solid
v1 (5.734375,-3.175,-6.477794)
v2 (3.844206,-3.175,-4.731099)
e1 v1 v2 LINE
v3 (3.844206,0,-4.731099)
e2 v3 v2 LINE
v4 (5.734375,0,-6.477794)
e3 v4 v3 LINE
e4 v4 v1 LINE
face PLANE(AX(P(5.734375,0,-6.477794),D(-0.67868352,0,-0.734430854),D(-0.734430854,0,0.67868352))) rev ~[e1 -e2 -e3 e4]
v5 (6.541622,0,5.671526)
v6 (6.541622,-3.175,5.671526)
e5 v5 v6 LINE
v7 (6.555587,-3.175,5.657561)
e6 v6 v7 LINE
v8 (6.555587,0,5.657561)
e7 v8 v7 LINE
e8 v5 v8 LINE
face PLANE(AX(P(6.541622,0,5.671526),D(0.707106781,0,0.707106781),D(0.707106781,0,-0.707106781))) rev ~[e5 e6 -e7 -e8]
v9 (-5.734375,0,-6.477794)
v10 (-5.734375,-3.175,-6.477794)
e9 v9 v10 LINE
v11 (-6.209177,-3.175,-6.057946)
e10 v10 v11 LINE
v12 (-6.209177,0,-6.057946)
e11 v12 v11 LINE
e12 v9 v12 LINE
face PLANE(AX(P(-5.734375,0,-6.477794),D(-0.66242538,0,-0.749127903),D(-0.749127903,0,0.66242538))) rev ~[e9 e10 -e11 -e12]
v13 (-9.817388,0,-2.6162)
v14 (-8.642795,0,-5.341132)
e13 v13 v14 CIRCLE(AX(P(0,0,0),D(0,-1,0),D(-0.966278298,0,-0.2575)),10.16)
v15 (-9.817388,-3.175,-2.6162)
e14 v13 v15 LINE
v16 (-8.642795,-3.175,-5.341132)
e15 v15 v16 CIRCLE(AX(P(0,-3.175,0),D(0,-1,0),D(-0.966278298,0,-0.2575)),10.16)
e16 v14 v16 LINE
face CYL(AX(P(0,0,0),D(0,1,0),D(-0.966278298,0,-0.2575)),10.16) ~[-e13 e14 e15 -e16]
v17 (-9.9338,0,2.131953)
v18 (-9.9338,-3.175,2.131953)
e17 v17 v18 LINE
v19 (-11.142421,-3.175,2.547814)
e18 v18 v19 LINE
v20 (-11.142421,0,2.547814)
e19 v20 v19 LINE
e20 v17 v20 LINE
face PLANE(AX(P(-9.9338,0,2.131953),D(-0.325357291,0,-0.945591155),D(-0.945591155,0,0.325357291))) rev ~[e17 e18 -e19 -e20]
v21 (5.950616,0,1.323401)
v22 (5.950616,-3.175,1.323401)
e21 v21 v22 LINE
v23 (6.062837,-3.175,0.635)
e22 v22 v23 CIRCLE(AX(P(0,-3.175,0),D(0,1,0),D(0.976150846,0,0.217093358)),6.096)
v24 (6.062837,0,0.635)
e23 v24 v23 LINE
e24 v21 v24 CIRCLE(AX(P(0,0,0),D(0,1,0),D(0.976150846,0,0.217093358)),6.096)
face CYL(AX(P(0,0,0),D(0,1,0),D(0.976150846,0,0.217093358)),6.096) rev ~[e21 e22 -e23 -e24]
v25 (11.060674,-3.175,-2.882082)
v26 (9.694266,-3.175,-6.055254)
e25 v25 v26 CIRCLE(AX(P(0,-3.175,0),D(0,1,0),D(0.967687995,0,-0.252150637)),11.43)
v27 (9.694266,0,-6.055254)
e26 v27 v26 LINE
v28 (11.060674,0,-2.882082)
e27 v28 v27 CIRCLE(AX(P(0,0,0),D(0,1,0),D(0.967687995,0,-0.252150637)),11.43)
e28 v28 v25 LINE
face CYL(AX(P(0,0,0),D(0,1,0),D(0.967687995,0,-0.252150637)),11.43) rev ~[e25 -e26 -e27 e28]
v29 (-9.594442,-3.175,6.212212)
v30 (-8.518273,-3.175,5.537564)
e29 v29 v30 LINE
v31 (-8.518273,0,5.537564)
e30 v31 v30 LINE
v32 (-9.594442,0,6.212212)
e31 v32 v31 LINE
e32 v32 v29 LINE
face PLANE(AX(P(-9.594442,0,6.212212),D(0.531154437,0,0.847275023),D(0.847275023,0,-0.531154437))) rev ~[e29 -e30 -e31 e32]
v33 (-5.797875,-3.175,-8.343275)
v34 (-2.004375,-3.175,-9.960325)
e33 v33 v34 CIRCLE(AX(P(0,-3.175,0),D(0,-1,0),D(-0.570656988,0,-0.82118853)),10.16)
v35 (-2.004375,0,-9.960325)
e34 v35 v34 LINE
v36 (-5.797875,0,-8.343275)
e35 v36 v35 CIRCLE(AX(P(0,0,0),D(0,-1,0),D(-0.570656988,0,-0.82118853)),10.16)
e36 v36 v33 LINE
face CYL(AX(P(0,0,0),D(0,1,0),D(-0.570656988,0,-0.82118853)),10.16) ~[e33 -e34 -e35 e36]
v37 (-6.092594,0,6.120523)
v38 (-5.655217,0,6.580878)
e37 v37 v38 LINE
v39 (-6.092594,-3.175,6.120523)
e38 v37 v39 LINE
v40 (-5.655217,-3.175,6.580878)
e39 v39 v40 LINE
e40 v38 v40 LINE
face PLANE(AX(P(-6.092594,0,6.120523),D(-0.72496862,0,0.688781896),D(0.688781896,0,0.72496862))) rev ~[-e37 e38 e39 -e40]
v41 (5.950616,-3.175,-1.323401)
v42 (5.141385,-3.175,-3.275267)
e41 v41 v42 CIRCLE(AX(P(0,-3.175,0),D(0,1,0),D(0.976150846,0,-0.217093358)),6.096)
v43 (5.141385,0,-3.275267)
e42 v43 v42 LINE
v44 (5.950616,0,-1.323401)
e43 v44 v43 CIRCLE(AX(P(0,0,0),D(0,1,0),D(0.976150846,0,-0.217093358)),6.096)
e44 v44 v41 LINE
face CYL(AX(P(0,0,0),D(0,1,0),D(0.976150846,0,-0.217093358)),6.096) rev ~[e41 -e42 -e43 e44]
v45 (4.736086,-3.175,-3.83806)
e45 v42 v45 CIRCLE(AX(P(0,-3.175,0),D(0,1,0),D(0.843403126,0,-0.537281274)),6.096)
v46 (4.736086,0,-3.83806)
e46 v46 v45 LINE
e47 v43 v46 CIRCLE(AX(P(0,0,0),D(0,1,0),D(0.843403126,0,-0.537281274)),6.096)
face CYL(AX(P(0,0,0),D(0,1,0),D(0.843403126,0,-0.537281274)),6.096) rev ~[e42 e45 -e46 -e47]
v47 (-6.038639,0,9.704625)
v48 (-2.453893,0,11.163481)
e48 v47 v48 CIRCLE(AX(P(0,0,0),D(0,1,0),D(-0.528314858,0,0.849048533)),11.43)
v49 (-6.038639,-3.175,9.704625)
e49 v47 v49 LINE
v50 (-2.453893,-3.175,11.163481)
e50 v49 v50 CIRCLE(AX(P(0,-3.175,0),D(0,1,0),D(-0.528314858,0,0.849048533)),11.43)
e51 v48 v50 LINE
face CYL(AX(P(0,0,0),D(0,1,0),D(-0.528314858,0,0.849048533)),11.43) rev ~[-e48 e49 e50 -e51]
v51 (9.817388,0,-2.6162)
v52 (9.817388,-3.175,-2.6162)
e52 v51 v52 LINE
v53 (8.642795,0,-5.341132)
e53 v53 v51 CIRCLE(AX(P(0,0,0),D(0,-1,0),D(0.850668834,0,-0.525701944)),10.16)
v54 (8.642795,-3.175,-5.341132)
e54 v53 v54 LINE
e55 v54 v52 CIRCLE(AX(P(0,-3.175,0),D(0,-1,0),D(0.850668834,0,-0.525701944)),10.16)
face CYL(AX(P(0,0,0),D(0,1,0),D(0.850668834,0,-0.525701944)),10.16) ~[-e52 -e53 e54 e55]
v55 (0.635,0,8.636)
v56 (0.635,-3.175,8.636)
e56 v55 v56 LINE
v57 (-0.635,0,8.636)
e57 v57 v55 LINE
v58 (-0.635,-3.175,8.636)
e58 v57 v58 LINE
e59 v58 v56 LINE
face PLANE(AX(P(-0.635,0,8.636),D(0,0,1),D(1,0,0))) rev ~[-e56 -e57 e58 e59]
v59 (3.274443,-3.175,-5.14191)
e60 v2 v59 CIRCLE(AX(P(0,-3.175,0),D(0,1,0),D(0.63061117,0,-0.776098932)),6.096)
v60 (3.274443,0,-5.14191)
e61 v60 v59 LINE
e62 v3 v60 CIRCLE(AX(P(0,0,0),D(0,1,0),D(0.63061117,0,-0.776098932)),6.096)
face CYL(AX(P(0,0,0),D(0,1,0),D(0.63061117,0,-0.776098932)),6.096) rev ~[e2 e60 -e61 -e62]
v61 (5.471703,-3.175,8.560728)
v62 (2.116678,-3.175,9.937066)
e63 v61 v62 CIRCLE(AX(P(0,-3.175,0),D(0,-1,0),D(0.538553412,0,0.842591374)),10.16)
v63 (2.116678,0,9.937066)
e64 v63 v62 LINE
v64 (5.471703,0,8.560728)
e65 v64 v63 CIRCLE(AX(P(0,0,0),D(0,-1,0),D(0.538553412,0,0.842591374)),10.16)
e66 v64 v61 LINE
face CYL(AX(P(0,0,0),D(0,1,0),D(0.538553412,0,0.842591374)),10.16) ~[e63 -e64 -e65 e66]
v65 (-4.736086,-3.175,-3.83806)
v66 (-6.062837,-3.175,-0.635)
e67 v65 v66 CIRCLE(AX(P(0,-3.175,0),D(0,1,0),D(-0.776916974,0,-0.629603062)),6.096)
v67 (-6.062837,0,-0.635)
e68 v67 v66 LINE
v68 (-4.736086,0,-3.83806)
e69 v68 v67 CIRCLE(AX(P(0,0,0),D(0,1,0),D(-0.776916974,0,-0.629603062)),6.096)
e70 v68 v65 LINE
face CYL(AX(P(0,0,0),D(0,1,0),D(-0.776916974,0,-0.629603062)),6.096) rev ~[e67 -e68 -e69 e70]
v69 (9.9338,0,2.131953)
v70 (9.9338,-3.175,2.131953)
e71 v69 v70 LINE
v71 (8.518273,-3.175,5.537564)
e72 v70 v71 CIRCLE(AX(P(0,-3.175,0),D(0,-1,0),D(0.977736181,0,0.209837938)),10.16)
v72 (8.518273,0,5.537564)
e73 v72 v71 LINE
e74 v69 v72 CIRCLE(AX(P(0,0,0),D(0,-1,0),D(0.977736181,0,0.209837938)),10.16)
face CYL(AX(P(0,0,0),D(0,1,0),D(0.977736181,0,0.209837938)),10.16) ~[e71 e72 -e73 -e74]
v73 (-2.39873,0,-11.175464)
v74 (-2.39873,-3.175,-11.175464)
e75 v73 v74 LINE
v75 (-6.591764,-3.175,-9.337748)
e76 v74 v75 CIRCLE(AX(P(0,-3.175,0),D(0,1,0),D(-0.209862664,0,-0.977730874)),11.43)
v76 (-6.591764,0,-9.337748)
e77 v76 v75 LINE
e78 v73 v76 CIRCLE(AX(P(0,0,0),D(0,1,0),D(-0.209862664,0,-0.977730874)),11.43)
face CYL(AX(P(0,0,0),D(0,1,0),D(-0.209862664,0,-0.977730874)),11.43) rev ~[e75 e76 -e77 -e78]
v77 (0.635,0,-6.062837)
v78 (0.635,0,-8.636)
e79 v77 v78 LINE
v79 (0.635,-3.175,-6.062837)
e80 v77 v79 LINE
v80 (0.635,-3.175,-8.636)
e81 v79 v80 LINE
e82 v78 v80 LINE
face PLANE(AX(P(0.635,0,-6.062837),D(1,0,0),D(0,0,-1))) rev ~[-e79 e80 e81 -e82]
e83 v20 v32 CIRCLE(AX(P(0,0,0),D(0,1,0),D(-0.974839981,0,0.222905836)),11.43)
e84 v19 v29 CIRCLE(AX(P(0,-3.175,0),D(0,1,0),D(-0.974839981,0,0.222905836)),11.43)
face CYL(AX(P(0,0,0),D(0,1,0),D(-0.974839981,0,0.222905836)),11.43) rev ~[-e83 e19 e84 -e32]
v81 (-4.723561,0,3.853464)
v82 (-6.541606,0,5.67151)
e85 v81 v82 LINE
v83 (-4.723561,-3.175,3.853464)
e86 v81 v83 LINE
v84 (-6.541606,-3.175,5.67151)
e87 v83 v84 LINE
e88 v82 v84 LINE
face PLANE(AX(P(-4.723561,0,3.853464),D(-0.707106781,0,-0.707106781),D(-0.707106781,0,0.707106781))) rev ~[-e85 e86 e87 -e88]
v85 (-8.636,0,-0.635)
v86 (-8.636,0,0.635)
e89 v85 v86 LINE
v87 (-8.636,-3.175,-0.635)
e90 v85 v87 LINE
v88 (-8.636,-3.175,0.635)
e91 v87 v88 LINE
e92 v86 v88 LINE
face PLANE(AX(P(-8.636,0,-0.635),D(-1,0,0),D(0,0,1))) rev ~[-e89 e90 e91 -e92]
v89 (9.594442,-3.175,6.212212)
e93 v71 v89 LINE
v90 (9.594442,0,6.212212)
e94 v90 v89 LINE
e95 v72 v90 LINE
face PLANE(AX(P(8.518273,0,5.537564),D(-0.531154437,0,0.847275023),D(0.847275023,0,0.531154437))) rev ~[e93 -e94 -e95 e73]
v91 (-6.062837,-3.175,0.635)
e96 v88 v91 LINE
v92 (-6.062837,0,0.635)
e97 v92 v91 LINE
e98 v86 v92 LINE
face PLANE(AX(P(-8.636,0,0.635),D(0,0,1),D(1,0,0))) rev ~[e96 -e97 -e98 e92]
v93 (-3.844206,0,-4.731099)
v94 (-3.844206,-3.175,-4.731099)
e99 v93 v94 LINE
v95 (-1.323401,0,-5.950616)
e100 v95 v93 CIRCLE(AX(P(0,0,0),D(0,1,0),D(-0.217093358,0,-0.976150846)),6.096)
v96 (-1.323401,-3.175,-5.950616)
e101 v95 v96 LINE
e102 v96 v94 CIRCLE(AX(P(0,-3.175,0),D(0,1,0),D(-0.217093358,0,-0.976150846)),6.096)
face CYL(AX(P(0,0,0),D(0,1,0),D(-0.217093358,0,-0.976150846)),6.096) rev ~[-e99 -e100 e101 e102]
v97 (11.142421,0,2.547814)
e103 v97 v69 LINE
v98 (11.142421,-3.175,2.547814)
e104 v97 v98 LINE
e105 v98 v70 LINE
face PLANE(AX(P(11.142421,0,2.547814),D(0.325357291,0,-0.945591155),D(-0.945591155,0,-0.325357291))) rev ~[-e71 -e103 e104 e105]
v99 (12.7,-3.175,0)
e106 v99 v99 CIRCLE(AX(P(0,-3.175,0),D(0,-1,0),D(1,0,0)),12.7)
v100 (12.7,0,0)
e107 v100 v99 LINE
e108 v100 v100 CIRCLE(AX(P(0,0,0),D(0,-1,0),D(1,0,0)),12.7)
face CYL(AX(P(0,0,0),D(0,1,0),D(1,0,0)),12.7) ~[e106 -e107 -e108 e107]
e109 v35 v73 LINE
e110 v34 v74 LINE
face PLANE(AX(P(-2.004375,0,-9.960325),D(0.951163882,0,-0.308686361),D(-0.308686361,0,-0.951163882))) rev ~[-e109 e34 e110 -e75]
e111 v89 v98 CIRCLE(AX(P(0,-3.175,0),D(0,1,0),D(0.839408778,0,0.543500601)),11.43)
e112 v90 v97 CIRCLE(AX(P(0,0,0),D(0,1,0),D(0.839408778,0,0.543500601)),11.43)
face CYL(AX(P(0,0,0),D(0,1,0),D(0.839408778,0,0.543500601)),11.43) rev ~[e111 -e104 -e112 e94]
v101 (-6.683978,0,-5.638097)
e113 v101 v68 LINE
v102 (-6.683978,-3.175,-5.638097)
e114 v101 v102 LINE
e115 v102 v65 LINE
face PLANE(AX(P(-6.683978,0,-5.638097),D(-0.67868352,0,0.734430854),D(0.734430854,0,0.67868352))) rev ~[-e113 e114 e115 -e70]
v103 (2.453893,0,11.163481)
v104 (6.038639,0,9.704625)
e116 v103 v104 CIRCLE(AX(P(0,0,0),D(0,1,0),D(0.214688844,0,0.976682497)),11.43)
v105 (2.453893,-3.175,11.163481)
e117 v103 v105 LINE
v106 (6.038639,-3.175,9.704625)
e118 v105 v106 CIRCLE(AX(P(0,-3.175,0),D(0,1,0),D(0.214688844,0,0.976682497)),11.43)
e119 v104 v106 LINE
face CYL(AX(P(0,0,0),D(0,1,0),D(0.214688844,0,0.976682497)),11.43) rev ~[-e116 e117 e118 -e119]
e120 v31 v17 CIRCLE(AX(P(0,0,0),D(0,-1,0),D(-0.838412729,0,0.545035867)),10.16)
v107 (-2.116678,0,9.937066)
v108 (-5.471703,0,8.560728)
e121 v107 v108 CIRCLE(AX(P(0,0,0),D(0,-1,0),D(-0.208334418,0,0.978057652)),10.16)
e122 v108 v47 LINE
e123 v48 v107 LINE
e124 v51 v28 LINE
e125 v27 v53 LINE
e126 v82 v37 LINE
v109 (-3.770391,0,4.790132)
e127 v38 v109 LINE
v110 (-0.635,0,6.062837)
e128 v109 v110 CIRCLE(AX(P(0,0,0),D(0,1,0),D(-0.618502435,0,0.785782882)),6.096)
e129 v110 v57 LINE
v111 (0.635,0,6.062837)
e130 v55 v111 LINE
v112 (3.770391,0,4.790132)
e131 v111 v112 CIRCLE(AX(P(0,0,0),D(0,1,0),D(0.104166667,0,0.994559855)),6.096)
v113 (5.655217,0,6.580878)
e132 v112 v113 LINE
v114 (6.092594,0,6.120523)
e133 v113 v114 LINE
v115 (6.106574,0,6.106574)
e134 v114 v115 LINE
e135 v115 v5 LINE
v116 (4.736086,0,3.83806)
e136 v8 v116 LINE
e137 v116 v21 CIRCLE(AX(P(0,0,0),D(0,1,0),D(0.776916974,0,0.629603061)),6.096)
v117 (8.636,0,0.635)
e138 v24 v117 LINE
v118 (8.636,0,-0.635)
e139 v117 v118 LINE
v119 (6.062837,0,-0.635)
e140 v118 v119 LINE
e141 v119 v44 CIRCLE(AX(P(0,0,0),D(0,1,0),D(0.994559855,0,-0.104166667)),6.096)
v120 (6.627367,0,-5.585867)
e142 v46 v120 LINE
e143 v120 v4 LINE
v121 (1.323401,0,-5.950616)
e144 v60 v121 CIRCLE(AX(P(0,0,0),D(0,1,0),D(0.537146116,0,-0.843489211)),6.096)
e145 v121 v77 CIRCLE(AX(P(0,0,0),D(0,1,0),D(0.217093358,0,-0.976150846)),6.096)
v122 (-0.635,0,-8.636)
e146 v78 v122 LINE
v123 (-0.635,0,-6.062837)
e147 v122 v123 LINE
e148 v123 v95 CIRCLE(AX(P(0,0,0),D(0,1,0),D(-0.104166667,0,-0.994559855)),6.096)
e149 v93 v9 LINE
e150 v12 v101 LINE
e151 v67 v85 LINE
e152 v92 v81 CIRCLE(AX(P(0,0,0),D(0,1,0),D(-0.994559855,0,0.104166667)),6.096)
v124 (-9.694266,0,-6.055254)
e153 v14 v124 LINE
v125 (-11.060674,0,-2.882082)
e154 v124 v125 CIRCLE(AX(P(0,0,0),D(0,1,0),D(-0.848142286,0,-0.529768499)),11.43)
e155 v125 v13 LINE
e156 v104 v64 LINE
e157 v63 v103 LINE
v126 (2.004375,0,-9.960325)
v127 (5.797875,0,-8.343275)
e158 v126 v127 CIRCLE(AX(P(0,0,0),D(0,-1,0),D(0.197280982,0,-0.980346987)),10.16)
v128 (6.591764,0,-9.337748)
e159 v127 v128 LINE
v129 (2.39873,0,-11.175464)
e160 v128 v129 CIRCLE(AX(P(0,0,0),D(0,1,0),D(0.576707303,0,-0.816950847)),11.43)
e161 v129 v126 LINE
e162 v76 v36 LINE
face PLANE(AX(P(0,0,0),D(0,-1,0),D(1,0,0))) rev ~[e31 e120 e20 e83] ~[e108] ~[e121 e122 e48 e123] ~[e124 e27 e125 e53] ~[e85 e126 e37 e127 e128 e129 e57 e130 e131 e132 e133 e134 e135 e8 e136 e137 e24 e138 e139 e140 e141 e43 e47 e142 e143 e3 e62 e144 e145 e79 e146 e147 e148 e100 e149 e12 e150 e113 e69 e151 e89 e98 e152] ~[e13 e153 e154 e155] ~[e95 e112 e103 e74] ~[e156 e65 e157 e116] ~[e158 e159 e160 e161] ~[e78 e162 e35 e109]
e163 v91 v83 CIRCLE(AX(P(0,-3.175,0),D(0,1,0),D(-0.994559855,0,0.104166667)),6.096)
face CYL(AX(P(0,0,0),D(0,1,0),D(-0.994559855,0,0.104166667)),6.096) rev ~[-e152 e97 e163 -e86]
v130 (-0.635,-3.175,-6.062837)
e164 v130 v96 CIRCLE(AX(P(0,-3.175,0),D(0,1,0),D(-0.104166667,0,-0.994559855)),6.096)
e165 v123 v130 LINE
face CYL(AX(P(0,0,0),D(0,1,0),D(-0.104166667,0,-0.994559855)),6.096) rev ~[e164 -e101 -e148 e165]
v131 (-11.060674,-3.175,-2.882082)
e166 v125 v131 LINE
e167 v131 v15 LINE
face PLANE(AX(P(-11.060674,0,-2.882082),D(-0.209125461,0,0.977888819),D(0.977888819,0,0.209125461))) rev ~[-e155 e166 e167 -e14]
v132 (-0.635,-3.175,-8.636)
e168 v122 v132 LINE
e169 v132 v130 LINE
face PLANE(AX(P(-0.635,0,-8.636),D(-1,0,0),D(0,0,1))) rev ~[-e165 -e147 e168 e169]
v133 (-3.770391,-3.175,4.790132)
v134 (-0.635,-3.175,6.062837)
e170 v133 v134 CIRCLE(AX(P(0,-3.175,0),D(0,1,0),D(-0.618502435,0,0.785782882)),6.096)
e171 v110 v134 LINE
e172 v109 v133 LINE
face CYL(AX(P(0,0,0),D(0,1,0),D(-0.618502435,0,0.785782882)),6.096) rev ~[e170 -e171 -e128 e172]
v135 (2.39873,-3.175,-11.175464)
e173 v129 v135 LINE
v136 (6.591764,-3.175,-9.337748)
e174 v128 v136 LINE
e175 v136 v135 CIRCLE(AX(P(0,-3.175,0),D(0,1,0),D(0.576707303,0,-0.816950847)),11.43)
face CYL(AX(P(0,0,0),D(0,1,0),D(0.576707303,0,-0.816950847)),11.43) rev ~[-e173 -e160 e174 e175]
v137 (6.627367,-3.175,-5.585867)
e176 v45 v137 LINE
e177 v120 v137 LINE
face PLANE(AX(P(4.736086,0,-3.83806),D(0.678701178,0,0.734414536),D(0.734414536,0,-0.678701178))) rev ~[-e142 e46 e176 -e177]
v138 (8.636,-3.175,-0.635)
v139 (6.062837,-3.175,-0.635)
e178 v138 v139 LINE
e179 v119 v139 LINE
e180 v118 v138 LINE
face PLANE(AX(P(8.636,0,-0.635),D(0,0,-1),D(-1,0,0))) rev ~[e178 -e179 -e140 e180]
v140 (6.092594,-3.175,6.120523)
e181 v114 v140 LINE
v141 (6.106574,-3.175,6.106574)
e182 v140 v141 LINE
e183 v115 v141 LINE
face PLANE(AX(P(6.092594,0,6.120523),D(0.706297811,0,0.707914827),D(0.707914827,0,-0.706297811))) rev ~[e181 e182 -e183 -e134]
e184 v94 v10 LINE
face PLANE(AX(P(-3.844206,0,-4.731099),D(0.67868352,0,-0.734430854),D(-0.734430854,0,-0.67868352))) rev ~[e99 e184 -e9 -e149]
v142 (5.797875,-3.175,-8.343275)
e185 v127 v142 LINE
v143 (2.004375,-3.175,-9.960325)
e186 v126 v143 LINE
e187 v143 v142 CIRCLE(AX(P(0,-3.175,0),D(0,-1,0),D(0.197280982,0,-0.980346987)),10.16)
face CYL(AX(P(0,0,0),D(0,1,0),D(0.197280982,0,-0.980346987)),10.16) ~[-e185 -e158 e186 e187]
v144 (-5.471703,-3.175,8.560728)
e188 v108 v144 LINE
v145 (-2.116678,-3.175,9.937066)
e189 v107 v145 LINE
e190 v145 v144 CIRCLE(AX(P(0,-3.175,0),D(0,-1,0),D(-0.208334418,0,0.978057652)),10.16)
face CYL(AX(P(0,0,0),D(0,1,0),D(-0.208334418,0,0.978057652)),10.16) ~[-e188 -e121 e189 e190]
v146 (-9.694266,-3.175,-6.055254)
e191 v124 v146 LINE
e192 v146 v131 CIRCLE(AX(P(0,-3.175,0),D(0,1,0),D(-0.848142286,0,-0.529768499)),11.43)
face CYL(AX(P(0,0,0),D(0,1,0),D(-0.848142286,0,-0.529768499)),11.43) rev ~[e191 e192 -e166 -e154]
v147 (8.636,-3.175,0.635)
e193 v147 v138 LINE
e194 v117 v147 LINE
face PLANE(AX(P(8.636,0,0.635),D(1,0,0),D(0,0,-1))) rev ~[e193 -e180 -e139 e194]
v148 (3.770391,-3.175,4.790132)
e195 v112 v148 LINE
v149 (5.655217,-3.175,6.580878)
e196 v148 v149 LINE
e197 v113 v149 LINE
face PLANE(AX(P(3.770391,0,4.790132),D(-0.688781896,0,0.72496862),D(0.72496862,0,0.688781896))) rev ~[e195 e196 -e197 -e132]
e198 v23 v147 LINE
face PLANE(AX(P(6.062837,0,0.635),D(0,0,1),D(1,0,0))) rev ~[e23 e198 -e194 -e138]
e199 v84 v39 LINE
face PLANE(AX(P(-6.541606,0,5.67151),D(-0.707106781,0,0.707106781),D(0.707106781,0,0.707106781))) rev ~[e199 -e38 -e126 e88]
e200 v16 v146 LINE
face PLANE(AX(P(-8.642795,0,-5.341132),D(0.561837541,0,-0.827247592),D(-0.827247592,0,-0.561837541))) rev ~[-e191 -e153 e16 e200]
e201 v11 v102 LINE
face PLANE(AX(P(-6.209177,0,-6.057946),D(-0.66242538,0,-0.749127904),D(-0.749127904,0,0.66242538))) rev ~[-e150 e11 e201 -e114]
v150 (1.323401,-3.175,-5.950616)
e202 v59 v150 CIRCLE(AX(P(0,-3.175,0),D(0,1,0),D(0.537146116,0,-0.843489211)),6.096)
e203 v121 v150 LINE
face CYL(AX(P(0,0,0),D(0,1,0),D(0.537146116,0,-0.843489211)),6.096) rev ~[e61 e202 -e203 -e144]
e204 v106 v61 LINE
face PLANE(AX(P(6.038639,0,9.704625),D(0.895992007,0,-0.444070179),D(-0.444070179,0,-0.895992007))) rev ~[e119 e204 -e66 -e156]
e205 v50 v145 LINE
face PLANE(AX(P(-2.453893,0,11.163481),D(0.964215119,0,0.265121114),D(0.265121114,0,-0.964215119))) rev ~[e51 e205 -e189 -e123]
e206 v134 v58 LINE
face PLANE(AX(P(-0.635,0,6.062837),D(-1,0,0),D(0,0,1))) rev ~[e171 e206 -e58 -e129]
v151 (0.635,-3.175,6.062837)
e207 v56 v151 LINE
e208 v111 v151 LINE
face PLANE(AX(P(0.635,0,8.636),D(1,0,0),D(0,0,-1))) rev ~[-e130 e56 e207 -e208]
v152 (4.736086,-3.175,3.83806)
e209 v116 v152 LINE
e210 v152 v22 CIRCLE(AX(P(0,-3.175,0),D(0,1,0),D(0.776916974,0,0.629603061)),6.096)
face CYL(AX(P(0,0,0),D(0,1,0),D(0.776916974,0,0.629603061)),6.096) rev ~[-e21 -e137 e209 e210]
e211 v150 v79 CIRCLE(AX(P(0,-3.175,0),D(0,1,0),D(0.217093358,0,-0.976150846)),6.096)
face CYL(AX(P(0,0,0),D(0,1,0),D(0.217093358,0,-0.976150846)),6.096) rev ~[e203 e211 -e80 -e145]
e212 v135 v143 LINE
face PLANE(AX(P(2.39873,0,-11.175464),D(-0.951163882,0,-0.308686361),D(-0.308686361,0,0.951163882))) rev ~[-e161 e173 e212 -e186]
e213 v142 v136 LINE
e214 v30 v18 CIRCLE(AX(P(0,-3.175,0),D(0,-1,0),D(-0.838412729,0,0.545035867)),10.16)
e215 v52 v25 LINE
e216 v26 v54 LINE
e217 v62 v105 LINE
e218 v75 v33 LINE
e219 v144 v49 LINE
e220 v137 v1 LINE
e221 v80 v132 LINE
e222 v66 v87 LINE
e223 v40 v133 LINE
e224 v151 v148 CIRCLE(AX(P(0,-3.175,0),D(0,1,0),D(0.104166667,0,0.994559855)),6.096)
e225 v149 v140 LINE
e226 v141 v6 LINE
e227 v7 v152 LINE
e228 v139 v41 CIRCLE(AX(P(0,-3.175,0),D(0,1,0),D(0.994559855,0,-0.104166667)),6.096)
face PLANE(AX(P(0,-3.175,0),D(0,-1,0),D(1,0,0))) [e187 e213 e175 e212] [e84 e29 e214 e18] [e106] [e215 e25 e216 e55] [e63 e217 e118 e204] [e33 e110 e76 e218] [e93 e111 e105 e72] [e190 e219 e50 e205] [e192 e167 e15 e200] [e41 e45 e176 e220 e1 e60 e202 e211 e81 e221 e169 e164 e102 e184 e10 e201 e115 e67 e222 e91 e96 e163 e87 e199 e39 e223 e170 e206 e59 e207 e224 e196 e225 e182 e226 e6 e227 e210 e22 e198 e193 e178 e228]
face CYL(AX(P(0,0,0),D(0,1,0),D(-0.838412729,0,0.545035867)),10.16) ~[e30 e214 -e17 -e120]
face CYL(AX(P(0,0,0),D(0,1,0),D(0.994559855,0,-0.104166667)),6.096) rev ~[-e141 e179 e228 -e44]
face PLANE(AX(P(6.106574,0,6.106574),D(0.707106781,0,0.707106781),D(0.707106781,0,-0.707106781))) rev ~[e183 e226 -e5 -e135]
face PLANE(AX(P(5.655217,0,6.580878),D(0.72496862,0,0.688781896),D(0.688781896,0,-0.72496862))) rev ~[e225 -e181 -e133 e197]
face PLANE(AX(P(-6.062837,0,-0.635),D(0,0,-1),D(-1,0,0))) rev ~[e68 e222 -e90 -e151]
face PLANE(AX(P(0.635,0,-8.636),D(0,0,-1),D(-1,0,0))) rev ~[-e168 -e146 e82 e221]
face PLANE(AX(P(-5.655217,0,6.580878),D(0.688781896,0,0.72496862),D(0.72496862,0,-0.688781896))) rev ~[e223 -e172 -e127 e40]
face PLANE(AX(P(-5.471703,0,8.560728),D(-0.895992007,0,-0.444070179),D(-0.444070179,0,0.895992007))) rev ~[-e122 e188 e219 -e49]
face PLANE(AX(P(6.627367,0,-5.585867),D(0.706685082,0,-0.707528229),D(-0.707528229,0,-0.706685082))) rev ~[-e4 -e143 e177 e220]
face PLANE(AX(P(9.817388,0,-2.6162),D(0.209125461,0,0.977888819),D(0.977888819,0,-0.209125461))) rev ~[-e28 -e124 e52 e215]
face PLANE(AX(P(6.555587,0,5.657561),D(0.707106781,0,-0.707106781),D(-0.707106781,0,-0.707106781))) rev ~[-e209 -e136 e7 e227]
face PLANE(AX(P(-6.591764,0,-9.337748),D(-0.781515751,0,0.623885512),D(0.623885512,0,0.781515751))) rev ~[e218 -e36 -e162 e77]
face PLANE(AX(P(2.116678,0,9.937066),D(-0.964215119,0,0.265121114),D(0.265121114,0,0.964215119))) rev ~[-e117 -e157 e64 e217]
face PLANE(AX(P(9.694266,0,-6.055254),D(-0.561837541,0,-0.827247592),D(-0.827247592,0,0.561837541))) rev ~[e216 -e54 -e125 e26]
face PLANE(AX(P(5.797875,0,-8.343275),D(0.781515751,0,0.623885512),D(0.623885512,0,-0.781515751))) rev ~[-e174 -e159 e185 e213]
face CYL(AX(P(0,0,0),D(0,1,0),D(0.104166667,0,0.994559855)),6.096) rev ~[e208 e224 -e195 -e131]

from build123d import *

# Parameters (mm, degrees)
F0_R     = 12.7
F1_DEPTH = 3.175


# Not quite as in the source:
# - ends of sketch curves that miss each other by under 0.0002 mm in the source are joined


with BuildPart() as f1:
    # F0 (on Front) → F1 (new body)
    with BuildSketch(Plane.XZ):
        Circle(F0_R)
        with BuildLine():
            ThreePointArc((11.1424209807, 2.5478137078), (11.3578777025, 1.2819961371), (11.43, 0))
            ThreePointArc((11.43, 0), (11.3372924765, -1.4528245947), (11.0606737878, -2.8820817755))
            ThreePointArc((11.0606737878, -2.8820817755), (10.498054115, -4.5205928591), (9.694266327, -6.0552539485))
            ThreePointArc((9.694266327, -6.0552539485), (8.3067678362, -7.8512742988), (6.5917644701, -9.3377481852))
            ThreePointArc((6.5917644701, -9.3377481852), (4.5881966593, -10.4686843212), (2.3987302505, -11.1754638913))
            ThreePointArc((2.3987302505, -11.1754638913), (0, -11.43), (-2.3987302505, -11.1754638913))
            ThreePointArc((-2.3987302505, -11.1754638913), (-4.5881966593, -10.4686843212), (-6.5917644701, -9.3377481852))
            ThreePointArc((-6.5917644701, -9.3377481852), (-8.3067678362, -7.8512742988), (-9.694266327, -6.0552539485))
            ThreePointArc((-9.694266327, -6.0552539485), (-10.498054115, -4.5205928591), (-11.0606737878, -2.8820817755))
            ThreePointArc((-11.0606737878, -2.8820817755), (-11.4287048944, -0.1720593972), (-11.1424209807, 2.5478137078))
            ThreePointArc((-11.1424209807, 2.5478137078), (-10.5290706386, 4.4478726922), (-9.5944423354, 6.2122118663))
            ThreePointArc((-9.5944423354, 6.2122118663), (-8.0092161617, 8.1545911286), (-6.0386388222, 9.7046247313))
            ThreePointArc((-6.0386388222, 9.7046247313), (-4.3084616277, 10.5868814295), (-2.4538934823, 11.1634809436))
            ThreePointArc((-2.4538934823, 11.1634809436), (0, 11.43), (2.4538934823, 11.1634809436))
            ThreePointArc((2.4538934823, 11.1634809436), (4.3084616277, 10.5868814295), (6.0386388222, 9.7046247313))
            ThreePointArc((6.0386388222, 9.7046247313), (8.0092161617, 8.1545911286), (9.5944423354, 6.2122118663))
            ThreePointArc((9.5944423354, 6.2122118663), (10.5290706386, 4.4478726922), (11.1424209807, 2.5478137078))
        make_face(mode=Mode.SUBTRACT)
        with BuildLine():
            ThreePointArc((10.16, 0), (10.10329164, 1.0719599045), (9.933799599, 2.1319534531))
            ThreePointArc((9.933799599, 2.1319534531), (9.3818599064, 3.8995262145), (8.5182733268, 5.5375644041))
            ThreePointArc((8.5182733268, 5.5375644041), (7.1564472405, 7.2118557178), (5.4717026611, 8.5607283562))
            ThreePointArc((5.4717026611, 8.5607283562), (3.8560932614, 9.3997949318), (2.1166776906, 9.9370657417))
            ThreePointArc((2.1166776906, 9.9370657417), (0, 10.16), (-2.1166776906, 9.9370657417))
            ThreePointArc((-2.1166776906, 9.9370657417), (-3.8560932614, 9.3997949318), (-5.4717026611, 8.5607283562))
            ThreePointArc((-5.4717026611, 8.5607283562), (-7.1564472405, 7.2118557178), (-8.5182733268, 5.5375644041))
            ThreePointArc((-8.5182733268, 5.5375644041), (-9.3818599064, 3.8995262145), (-9.933799599, 2.1319534531))
            ThreePointArc((-9.933799599, 2.1319534531), (-10.1569477884, -0.2490213305), (-9.817387512, -2.6162))
            ThreePointArc((-9.817387512, -2.6162), (-9.3301072422, -4.0217780707), (-8.6427953563, -5.3411317555))
            ThreePointArc((-8.6427953563, -5.3411317555), (-7.3747174058, -6.9885007824), (-5.7978750028, -8.343275463))
            ThreePointArc((-5.7978750028, -8.343275463), (-3.9840291181, -9.3462886744), (-2.0043747759, -9.9603253841))
            ThreePointArc((-2.0043747759, -9.9603253841), (0, -10.16), (2.0043747759, -9.9603253841))
            ThreePointArc((2.0043747759, -9.9603253841), (3.9840291181, -9.3462886744), (5.7978750028, -8.343275463))
            ThreePointArc((5.7978750028, -8.343275463), (7.3747174058, -6.9885007824), (8.6427953563, -5.3411317555))
            ThreePointArc((8.6427953563, -5.3411317555), (9.3301072422, -4.0217780707), (9.817387512, -2.6162))
            ThreePointArc((9.817387512, -2.6162), (10.0739827556, -1.3192692823), (10.16, 0))
        make_face()
        with BuildLine():
            ThreePointArc((4.7360858752, 3.8380602631), (5.4892872515, 2.6512150932), (5.9506155559, 1.323401113))
            Line((5.9506155559, 1.323401113), (8.636, 1.323401113))
            Line((8.636, 1.323401113), (8.636, 0.635))
            Line((8.636, 0.635), (8.636, 0))
            Line((8.636, 0), (8.636, -0.635))
            Line((8.636, -0.635), (8.636, -1.323401113))
            Line((8.636, -1.323401113), (5.9506155559, -1.323401113))
            ThreePointArc((5.9506155559, -1.323401113), (5.6312135784, -2.3346626382), (5.1413854537, -3.2752666482))
            Line((5.1413854537, -3.2752666482), (7.0945855376, -5.080295188))
            Line((7.0945855376, -5.080295188), (6.6273668913, -5.5858669721))
            Line((6.6273668913, -5.5858669721), (5.7343752763, -6.4777944262))
            Line((5.7343752763, -6.4777944262), (5.2671687856, -6.9833774435))
            Line((5.2671687856, -6.9833774435), (3.2744427263, -5.1419102319))
            ThreePointArc((3.2744427263, -5.1419102319), (2.3342114446, -5.631400619), (1.323401113, -5.9506155559))
            Line((1.323401113, -5.9506155559), (1.323401113, -8.636))
            Line((1.323401113, -8.636), (0.635, -8.636))
            Line((0.635, -8.636), (0, -8.636))
            Line((0, -8.636), (-0.635, -8.636))
            Line((-0.635, -8.636), (-1.323401113, -8.636))
            Line((-1.323401113, -8.636), (-1.323401113, -5.9506155559))
            ThreePointArc((-1.323401113, -5.9506155559), (-2.6547777921, -5.4875651135), (-3.8442056919, -4.7310990899))
            Line((-3.8442056919, -4.7310990899), (-5.7343752763, -6.4777944262))
            Line((-5.7343752763, -6.4777944262), (-6.2091766623, -6.0579455764))
            Line((-6.2091766623, -6.0579455764), (-6.6839780483, -5.6380967267))
            Line((-6.6839780483, -5.6380967267), (-4.7360858752, -3.8380602631))
            ThreePointArc((-4.7360858752, -3.8380602631), (-5.6319696302, -2.3328382037), (-6.0628368772, -0.635))
            Line((-6.0628368772, -0.635), (-8.636, -0.635))
            Line((-8.636, -0.635), (-8.636, 0))
            Line((-8.636, 0), (-8.636, 0.635))
            Line((-8.636, 0.635), (-6.0628368772, 0.635))
            ThreePointArc((-6.0628368772, 0.635), (-5.6281633501, 2.3420062564), (-4.7235609165, 3.8534644501))
            Line((-4.7235609165, 3.8534644501), (-6.5416064283, 5.671509962))
            Line((-6.5416064283, 5.671509962), (-6.0925936223, 6.120522768))
            Line((-6.0925936223, 6.120522768), (-5.6552171182, 6.5808778416))
            Line((-5.6552171182, 6.5808778416), (-3.7703908438, 4.7901324496))
            ThreePointArc((-3.7703908438, 4.7901324496), (-2.2927737049, 5.6483984224), (-0.635, 6.0628368772))
            Line((-0.635, 6.0628368772), (-0.635, 8.636))
            Line((-0.635, 8.636), (0, 8.636))
            Line((0, 8.636), (0.635, 8.636))
            Line((0.635, 8.636), (0.635, 6.0628368772))
            ThreePointArc((0.635, 6.0628368772), (2.2927737049, 5.6483984224), (3.7703908438, 4.7901324496))
            Line((3.7703908438, 4.7901324496), (5.6552171182, 6.5808778416))
            Line((5.6552171182, 6.5808778416), (6.0925936223, 6.120522768))
            Line((6.0925936223, 6.120522768), (6.1065741623, 6.1065741623))
            Line((6.1065741623, 6.1065741623), (6.5416223955, 5.6715259292))
            Line((6.5416223955, 5.6715259292), (6.5555869684, 5.6575613563))
            Line((6.5555869684, 5.6575613563), (4.7360858752, 3.8380602631))
        make_face(mode=Mode.SUBTRACT)
        with BuildLine():
            ThreePointArc((11.0606737878, -2.8820817755), (11.3372924765, -1.4528245947), (11.43, 0))
            ThreePointArc((11.43, 0), (11.3578777025, 1.2819961371), (11.1424209807, 2.5478137078))
            Line((11.1424209807, 2.5478137078), (9.933799599, 2.1319534531))
            ThreePointArc((9.933799599, 2.1319534531), (10.10329164, 1.0719599045), (10.16, 0))
            ThreePointArc((10.16, 0), (10.0739827556, -1.3192692823), (9.817387512, -2.6162))
            Line((9.817387512, -2.6162), (11.0606737878, -2.8820817755))
        make_face()
        with BuildLine():
            Line((-9.933799599, 2.1319534531), (-11.1424209807, 2.5478137078))
            ThreePointArc((-11.1424209807, 2.5478137078), (-11.4287048944, -0.1720593972), (-11.0606737878, -2.8820817755))
            Line((-11.0606737878, -2.8820817755), (-9.817387512, -2.6162))
            ThreePointArc((-9.817387512, -2.6162), (-10.1569477884, -0.2490213305), (-9.933799599, 2.1319534531))
        make_face()
        with BuildLine():
            Line((-5.4717026611, 8.5607283562), (-6.0386388222, 9.7046247313))
            ThreePointArc((-6.0386388222, 9.7046247313), (-8.0092161617, 8.1545911286), (-9.5944423354, 6.2122118663))
            Line((-9.5944423354, 6.2122118663), (-8.5182733268, 5.5375644041))
            ThreePointArc((-8.5182733268, 5.5375644041), (-7.1564472405, 7.2118557178), (-5.4717026611, 8.5607283562))
        make_face()
        with BuildLine():
            Line((8.5182733268, 5.5375644041), (9.5944423354, 6.2122118663))
            ThreePointArc((9.5944423354, 6.2122118663), (8.0092161617, 8.1545911286), (6.0386388222, 9.7046247313))
            Line((6.0386388222, 9.7046247313), (5.4717026611, 8.5607283562))
            ThreePointArc((5.4717026611, 8.5607283562), (7.1564472405, 7.2118557178), (8.5182733268, 5.5375644041))
        make_face()
        with BuildLine():
            Line((2.1166776906, 9.9370657417), (2.4538934823, 11.1634809436))
            ThreePointArc((2.4538934823, 11.1634809436), (0, 11.43), (-2.4538934823, 11.1634809436))
            Line((-2.4538934823, 11.1634809436), (-2.1166776906, 9.9370657417))
            ThreePointArc((-2.1166776906, 9.9370657417), (0, 10.16), (2.1166776906, 9.9370657417))
        make_face()
        with BuildLine():
            ThreePointArc((-2.3987302505, -11.1754638913), (0, -11.43), (2.3987302505, -11.1754638913))
            Line((2.3987302505, -11.1754638913), (2.0043747759, -9.9603253841))
            ThreePointArc((2.0043747759, -9.9603253841), (0, -10.16), (-2.0043747759, -9.9603253841))
            Line((-2.0043747759, -9.9603253841), (-2.3987302505, -11.1754638913))
        make_face()
        with BuildLine():
            ThreePointArc((6.5917644701, -9.3377481852), (8.3067678362, -7.8512742988), (9.694266327, -6.0552539485))
            Line((9.694266327, -6.0552539485), (8.6427953563, -5.3411317555))
            ThreePointArc((8.6427953563, -5.3411317555), (7.3747174058, -6.9885007824), (5.7978750028, -8.343275463))
            Line((5.7978750028, -8.343275463), (6.5917644701, -9.3377481852))
        make_face()
        with BuildLine():
            ThreePointArc((-9.694266327, -6.0552539485), (-8.3067678362, -7.8512742988), (-6.5917644701, -9.3377481852))
            Line((-6.5917644701, -9.3377481852), (-5.7978750028, -8.343275463))
            ThreePointArc((-5.7978750028, -8.343275463), (-7.3747174058, -6.9885007824), (-8.6427953563, -5.3411317555))
            Line((-8.6427953563, -5.3411317555), (-9.694266327, -6.0552539485))
        make_face()
        with BuildLine():
            Line((5.7343752763, -6.4777944262), (3.8442056919, -4.7310990899))
            ThreePointArc((3.8442056919, -4.7310990899), (3.565246173, -4.9447179623), (3.2744427263, -5.1419102319))
            Line((3.2744427263, -5.1419102319), (5.2671687856, -6.9833774435))
            Line((5.2671687856, -6.9833774435), (5.7343752763, -6.4777944262))
        make_face()
        with BuildLine():
            Line((1.323401113, -8.636), (1.323401113, -5.9506155559))
            ThreePointArc((1.323401113, -5.9506155559), (0.9808068801, -6.0165799142), (0.635, -6.0628368772))
            Line((0.635, -6.0628368772), (0.635, -8.636))
            Line((0.635, -8.636), (1.323401113, -8.636))
        make_face()
        with BuildLine():
            Line((-0.635, -8.636), (-0.635, -6.0628368772))
            ThreePointArc((-0.635, -6.0628368772), (-0.9808068801, -6.0165799142), (-1.323401113, -5.9506155559))
            Line((-1.323401113, -5.9506155559), (-1.323401113, -8.636))
            Line((-1.323401113, -8.636), (-0.635, -8.636))
        make_face()
        with BuildLine():
            Line((8.636, -0.635), (6.0628368772, -0.635))
            ThreePointArc((6.0628368772, -0.635), (6.0165799142, -0.9808068801), (5.9506155559, -1.323401113))
            Line((5.9506155559, -1.323401113), (8.636, -1.323401113))
            Line((8.636, -1.323401113), (8.636, -0.635))
        make_face()
        with BuildLine():
            ThreePointArc((5.9506155559, 1.323401113), (6.0165799142, 0.9808068801), (6.0628368772, 0.635))
            Line((6.0628368772, 0.635), (8.636, 0.635))
            Line((8.636, 0.635), (8.636, 1.323401113))
            Line((8.636, 1.323401113), (5.9506155559, 1.323401113))
        make_face()
        with BuildLine():
            Line((7.0945855376, -5.080295188), (5.1413854537, -3.2752666482))
            ThreePointArc((5.1413854537, -3.2752666482), (4.9467458118, -3.5624320167), (4.7360858752, -3.8380602631))
            Line((4.7360858752, -3.8380602631), (6.6273668913, -5.5858669721))
            Line((6.6273668913, -5.5858669721), (7.0945855376, -5.080295188))
        make_face()
    extrude(amount=F1_DEPTH)


solid = f1.part
